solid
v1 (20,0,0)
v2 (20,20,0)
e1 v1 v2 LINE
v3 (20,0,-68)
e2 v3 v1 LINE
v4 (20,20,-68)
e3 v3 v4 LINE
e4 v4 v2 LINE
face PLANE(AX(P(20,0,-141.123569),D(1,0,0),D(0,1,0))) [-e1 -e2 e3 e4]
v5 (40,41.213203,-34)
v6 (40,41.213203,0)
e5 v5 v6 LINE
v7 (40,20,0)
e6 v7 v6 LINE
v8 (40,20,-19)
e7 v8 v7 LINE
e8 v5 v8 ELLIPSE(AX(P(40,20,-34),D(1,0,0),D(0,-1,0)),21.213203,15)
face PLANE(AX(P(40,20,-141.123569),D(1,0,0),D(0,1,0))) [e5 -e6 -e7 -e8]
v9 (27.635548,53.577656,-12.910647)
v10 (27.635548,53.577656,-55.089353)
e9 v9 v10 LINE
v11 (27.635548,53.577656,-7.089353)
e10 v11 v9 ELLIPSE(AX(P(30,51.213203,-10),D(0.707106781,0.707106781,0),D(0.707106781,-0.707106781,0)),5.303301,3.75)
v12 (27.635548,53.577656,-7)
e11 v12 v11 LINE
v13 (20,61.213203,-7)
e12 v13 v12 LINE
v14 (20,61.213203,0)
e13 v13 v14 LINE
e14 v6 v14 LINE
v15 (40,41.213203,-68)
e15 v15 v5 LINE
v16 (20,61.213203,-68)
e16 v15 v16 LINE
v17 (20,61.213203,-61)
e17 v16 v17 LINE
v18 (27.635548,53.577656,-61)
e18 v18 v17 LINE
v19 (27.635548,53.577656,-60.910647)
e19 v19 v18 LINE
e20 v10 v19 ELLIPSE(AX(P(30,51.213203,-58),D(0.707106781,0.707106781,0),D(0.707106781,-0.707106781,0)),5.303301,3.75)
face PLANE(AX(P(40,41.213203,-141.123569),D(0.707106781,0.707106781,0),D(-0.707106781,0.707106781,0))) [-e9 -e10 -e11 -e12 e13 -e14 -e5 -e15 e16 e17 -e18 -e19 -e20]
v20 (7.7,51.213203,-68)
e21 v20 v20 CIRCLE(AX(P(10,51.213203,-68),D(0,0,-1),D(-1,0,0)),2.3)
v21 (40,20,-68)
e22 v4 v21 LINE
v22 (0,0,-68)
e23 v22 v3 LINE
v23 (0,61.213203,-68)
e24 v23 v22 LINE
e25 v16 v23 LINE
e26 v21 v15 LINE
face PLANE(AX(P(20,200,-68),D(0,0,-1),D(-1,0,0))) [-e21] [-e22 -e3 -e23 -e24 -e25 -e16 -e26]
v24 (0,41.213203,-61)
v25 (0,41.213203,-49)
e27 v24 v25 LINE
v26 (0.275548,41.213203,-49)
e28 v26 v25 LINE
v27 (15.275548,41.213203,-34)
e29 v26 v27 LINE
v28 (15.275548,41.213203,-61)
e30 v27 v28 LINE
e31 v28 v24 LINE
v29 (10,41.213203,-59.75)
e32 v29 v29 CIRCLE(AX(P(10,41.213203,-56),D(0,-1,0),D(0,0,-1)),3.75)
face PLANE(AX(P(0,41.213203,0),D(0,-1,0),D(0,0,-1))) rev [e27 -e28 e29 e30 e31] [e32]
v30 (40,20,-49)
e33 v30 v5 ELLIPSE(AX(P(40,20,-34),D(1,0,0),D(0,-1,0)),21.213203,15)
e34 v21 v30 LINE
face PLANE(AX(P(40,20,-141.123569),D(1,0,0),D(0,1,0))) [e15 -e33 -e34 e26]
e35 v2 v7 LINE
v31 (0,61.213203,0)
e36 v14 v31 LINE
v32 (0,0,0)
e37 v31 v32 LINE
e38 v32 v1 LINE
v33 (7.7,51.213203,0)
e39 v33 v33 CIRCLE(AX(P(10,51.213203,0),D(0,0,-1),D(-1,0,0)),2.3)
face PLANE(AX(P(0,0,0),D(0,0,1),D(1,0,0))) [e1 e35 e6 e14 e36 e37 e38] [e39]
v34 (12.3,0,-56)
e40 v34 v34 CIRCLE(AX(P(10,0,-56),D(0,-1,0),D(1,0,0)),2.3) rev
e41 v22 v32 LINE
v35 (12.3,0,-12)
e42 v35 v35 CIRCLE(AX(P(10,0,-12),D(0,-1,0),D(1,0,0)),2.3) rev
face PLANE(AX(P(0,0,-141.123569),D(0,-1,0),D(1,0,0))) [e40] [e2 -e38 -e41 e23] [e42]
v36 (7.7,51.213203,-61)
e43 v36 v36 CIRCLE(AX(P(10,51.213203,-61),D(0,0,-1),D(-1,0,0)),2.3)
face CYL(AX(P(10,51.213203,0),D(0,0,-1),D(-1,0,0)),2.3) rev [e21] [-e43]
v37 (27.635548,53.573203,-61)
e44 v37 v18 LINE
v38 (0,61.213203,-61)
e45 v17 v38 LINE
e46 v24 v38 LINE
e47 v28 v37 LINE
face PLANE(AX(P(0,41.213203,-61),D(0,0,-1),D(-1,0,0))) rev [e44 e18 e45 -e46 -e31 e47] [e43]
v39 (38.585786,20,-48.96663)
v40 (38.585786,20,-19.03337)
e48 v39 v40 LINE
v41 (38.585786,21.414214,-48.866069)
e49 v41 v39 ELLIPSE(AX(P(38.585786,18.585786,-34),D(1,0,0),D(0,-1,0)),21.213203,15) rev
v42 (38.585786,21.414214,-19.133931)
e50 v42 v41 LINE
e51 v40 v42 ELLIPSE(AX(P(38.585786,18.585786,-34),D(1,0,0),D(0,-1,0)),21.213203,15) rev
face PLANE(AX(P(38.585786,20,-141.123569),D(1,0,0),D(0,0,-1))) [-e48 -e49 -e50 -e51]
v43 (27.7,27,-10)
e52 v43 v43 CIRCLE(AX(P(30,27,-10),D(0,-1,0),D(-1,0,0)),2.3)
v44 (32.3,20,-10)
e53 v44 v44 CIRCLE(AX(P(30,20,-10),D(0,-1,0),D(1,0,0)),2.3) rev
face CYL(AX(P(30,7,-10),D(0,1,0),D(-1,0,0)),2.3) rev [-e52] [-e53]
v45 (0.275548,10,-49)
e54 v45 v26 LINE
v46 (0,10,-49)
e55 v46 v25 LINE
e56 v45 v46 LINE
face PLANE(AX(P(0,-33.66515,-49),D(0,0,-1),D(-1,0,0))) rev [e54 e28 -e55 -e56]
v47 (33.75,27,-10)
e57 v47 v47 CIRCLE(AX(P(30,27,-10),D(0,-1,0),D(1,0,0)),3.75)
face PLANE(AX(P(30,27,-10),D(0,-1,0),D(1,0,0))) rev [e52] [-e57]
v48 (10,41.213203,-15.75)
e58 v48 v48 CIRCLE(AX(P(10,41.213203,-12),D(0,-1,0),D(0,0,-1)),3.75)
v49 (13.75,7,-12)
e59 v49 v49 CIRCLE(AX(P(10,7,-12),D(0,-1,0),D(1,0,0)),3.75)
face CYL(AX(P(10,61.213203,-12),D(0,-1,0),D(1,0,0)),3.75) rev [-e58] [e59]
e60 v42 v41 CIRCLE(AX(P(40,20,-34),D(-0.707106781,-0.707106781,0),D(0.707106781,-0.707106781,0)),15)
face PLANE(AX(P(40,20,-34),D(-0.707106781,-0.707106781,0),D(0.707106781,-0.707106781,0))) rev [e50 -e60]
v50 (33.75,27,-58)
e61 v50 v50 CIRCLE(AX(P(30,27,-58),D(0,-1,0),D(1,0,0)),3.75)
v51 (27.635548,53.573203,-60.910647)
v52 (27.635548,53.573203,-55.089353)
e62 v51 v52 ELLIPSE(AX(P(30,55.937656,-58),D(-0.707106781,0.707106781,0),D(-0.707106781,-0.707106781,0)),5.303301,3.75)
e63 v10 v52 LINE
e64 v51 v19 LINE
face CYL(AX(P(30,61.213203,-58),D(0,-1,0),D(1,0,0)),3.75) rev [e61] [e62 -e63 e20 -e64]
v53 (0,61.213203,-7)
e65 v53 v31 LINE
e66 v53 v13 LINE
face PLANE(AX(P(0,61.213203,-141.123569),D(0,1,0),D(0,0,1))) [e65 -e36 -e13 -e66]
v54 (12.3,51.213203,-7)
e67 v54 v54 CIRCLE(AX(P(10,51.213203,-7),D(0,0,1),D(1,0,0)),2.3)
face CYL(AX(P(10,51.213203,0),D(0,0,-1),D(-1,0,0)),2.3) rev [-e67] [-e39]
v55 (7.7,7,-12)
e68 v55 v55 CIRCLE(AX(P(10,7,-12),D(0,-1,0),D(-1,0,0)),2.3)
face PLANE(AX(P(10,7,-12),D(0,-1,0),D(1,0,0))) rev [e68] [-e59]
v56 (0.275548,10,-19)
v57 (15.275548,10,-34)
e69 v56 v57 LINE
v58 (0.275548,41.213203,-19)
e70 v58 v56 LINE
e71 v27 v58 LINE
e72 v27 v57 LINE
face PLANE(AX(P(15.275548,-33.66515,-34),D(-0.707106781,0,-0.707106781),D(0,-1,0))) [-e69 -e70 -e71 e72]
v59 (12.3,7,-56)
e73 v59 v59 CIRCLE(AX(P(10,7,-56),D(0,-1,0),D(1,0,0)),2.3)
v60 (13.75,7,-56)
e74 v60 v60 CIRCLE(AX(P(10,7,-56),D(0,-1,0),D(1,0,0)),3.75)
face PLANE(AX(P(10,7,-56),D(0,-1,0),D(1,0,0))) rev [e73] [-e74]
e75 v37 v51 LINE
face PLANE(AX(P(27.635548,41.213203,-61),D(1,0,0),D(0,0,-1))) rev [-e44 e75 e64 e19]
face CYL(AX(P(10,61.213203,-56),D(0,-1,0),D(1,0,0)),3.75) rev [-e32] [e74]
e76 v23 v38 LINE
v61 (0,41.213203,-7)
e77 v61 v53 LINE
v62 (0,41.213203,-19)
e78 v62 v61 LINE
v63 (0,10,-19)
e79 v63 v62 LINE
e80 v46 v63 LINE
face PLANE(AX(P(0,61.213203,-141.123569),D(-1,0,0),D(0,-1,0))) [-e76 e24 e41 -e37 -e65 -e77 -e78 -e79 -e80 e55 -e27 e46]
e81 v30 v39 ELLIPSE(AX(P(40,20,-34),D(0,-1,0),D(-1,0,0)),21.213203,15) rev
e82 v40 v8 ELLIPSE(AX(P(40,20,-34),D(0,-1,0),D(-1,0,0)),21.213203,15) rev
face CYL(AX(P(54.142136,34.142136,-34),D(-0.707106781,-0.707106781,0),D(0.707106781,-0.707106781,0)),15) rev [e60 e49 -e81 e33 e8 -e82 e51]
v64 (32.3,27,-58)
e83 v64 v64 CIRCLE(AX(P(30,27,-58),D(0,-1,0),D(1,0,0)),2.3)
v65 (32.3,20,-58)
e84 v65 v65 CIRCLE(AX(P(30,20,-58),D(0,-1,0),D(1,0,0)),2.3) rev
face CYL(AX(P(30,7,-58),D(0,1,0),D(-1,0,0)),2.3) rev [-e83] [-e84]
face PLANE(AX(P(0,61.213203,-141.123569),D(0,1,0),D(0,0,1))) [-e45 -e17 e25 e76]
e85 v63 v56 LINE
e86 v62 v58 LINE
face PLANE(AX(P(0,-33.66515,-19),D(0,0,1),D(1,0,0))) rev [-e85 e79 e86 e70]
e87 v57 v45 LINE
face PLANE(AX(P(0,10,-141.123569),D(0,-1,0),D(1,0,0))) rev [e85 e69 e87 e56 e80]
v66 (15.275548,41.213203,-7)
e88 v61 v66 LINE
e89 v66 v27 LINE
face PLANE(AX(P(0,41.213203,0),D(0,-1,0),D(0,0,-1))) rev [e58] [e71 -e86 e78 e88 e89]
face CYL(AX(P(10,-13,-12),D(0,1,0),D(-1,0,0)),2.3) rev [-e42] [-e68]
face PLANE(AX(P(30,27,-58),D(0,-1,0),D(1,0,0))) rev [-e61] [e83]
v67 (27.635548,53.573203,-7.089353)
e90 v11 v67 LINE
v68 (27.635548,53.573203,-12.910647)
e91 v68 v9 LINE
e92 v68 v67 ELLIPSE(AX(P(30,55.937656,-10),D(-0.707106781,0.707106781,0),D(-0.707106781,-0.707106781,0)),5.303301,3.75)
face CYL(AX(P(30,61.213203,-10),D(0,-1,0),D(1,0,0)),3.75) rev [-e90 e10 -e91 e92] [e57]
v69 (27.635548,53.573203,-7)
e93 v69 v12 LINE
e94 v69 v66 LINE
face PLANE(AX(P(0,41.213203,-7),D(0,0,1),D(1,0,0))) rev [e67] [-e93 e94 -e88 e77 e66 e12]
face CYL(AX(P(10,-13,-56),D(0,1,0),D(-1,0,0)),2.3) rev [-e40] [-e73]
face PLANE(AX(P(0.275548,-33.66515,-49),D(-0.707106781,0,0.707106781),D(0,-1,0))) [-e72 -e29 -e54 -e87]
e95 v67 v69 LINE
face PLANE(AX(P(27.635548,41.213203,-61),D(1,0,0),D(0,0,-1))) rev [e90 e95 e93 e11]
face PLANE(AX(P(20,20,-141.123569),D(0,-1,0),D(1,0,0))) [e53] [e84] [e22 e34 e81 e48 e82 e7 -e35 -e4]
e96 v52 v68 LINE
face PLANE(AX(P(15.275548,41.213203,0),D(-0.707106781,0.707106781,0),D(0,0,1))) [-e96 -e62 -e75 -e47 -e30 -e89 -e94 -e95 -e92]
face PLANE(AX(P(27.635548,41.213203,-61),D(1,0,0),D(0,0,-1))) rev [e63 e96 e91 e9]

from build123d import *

# Parameters (mm, degrees)
AUFSATZ_LINEAR_AUSTRAGEN1_DEPTH = 68
SKIZZE4_R                       = 15
SCHNITT_LINEAR_AUSTRAGEN1_DEPTH = 20
SKIZZE9_W                       = 27.635547715
SKIZZE9_H                       = 54
SCHNITT_LINEAR_AUSTRAGEN6_DEPTH = 20
SKIZZE5_R                       = 2.3
SCHNITT_LINEAR_AUSTRAGEN2_DEPTH = 20
SKIZZE6_R                       = 3.75
SCHNITT_LINEAR_AUSTRAGEN3_DEPTH = 96.723933406
SKIZZE7_R                       = 2.3
SCHNITT_LINEAR_AUSTRAGEN4_DEPTH = 20
SKIZZE8_R                       = 3.75
SCHNITT_LINEAR_AUSTRAGEN5_DEPTH = 86.991530335
FASE1_SIZE                      = 12.36
SKIZZE10_W                      = 15.275547715
SKIZZE10_H                      = 30
SCHNITT_LINEAR_AUSTRAGEN7_DEPTH = 31.213203436
FASE2_SIZE                      = 15
SKIZZE12_R                      = 2.3
SCHNITT_LINEAR_AUSTRAGEN8_DEPTH = 100.855176505
FASE3_SIZE                      = 2
FASE3_SIZE2                     = 1.414213562


with BuildPart() as part:
    # Skizze1 → Aufsatz-Linear austragen1 (new body)
    with BuildSketch(Plane.XY):
        Polygon((0, 0), (20, 0), (20, 20), (40, 20), (40, 41.213203436), (20, 61.213203436), (0, 61.213203436), align=None)
    extrude(amount=-AUFSATZ_LINEAR_AUSTRAGEN1_DEPTH)

    # Skizze4 → Schnitt-Linear austragen1 (cut)
    with BuildSketch(Plane(origin=(30, 30, 0), x_dir=(0, 0, 1), z_dir=(-0.7071067811865507, -0.7071067811865445, -1.0200465955922179e-15))):
        with Locations((-34, -14.142135624)):
            Circle(SKIZZE4_R)
    extrude(amount=-SCHNITT_LINEAR_AUSTRAGEN1_DEPTH, mode=Mode.SUBTRACT)

    # Skizze9 → Schnitt-Linear austragen6 (cut)
    with BuildSketch(Plane(origin=(0, 61.213203436, 0), x_dir=(1, 0, 0), z_dir=(0, 1, 0))):
        with Locations((13.817773858, 34)):
            Rectangle(SKIZZE9_W, SKIZZE9_H)
    extrude(amount=-SCHNITT_LINEAR_AUSTRAGEN6_DEPTH, mode=Mode.SUBTRACT)

    # Skizze5 → Schnitt-Linear austragen2 (cut)
    with BuildSketch(Plane(origin=(0, 7, 0), x_dir=(-1, 0, 0), z_dir=(0, -1, 0))):
        with Locations(Location((-10, 56, 0), (0, 0, 180))):
            Circle(SKIZZE5_R)
        with Locations((-10, 12)):
            Circle(SKIZZE5_R)
    extrude(amount=SCHNITT_LINEAR_AUSTRAGEN2_DEPTH, mode=Mode.SUBTRACT)

    # Skizze6 → Schnitt-Linear austragen3 (cut, through all)
    with BuildSketch(Plane(origin=(0, 7, 0), x_dir=(-1, 0, 0), z_dir=(0, -1, 0))):
        with Locations(Location((-10, 56, 0), (0, 0, 180))):
            Circle(SKIZZE6_R)
        with Locations(Location((-10, 12, 0), (0, 0, 180))):
            Circle(SKIZZE6_R)
    extrude(amount=-SCHNITT_LINEAR_AUSTRAGEN3_DEPTH, mode=Mode.SUBTRACT)

    # Skizze7 → Schnitt-Linear austragen4 (cut)
    with BuildSketch(Plane(origin=(0, 27, 0), x_dir=(-1, 0, 0), z_dir=(0, -1, 0))):
        with Locations(Location((-30, 58, 0), (0, 0, 180))):
            Circle(SKIZZE7_R)
        with Locations((-30, 10)):
            Circle(SKIZZE7_R)
    extrude(amount=SCHNITT_LINEAR_AUSTRAGEN4_DEPTH, mode=Mode.SUBTRACT)

    # Skizze8 → Schnitt-Linear austragen5 (cut, through all)
    with BuildSketch(Plane(origin=(0, 27, 0), x_dir=(-1, 0, 0), z_dir=(0, -1, 0))):
        with Locations(Location((-30, 58, 0), (0, 0, 180))):
            Circle(SKIZZE8_R)
        with Locations(Location((-30, 10, 0), (0, 0, 180))):
            Circle(SKIZZE8_R)
    extrude(amount=-SCHNITT_LINEAR_AUSTRAGEN5_DEPTH, mode=Mode.SUBTRACT)

    # Fase1
    fase1_edges = [part.edges().sort_by_distance(p)[0] for p in [
        (27.635547715, 41.213203436, -34),
    ]]
    chamfer(fase1_edges, length=FASE1_SIZE)

    # Skizze10 → Schnitt-Linear austragen7 (cut)
    with BuildSketch(Plane(origin=(0, 41.213203436, 0), x_dir=(1, 0, 0), z_dir=(0, 1, 0))):
        with Locations((7.637773858, 34)):
            Rectangle(SKIZZE10_W, SKIZZE10_H)
    extrude(amount=-SCHNITT_LINEAR_AUSTRAGEN7_DEPTH, mode=Mode.SUBTRACT)

    # Fase2
    fase2_edges = [part.edges().sort_by_distance(p)[0] for p in [
        (15.275547715, 25.606601718, -19),
        (15.275547715, 25.606601718, -49),
    ]]
    chamfer(fase2_edges, length=FASE2_SIZE - 0.0001)  # a hair under: the kernel refuses the full size

    # Skizze12 → Schnitt-Linear austragen8 (cut, through all)
    with BuildSketch(Plane(origin=(0, 0, -68), x_dir=(-1, 0, 0), z_dir=(0, 0, -1))):
        with Locations((-10, 51.213203436)):
            Circle(SKIZZE12_R)
    extrude(amount=-SCHNITT_LINEAR_AUSTRAGEN8_DEPTH, mode=Mode.SUBTRACT)

    # Fase3
    fase3_edges = [part.edges().sort_by_distance(p)[0] for p in [
        (40, 20, -34),
    ]]
    fase3_side = [part.faces().sort_by_distance(p)[0] for p in [
        (35.498418419, 24.501581581, -34),
    ]]
    chamfer(fase3_edges, length=FASE3_SIZE, length2=FASE3_SIZE2, reference=fase3_side[0])


solid = part.part
